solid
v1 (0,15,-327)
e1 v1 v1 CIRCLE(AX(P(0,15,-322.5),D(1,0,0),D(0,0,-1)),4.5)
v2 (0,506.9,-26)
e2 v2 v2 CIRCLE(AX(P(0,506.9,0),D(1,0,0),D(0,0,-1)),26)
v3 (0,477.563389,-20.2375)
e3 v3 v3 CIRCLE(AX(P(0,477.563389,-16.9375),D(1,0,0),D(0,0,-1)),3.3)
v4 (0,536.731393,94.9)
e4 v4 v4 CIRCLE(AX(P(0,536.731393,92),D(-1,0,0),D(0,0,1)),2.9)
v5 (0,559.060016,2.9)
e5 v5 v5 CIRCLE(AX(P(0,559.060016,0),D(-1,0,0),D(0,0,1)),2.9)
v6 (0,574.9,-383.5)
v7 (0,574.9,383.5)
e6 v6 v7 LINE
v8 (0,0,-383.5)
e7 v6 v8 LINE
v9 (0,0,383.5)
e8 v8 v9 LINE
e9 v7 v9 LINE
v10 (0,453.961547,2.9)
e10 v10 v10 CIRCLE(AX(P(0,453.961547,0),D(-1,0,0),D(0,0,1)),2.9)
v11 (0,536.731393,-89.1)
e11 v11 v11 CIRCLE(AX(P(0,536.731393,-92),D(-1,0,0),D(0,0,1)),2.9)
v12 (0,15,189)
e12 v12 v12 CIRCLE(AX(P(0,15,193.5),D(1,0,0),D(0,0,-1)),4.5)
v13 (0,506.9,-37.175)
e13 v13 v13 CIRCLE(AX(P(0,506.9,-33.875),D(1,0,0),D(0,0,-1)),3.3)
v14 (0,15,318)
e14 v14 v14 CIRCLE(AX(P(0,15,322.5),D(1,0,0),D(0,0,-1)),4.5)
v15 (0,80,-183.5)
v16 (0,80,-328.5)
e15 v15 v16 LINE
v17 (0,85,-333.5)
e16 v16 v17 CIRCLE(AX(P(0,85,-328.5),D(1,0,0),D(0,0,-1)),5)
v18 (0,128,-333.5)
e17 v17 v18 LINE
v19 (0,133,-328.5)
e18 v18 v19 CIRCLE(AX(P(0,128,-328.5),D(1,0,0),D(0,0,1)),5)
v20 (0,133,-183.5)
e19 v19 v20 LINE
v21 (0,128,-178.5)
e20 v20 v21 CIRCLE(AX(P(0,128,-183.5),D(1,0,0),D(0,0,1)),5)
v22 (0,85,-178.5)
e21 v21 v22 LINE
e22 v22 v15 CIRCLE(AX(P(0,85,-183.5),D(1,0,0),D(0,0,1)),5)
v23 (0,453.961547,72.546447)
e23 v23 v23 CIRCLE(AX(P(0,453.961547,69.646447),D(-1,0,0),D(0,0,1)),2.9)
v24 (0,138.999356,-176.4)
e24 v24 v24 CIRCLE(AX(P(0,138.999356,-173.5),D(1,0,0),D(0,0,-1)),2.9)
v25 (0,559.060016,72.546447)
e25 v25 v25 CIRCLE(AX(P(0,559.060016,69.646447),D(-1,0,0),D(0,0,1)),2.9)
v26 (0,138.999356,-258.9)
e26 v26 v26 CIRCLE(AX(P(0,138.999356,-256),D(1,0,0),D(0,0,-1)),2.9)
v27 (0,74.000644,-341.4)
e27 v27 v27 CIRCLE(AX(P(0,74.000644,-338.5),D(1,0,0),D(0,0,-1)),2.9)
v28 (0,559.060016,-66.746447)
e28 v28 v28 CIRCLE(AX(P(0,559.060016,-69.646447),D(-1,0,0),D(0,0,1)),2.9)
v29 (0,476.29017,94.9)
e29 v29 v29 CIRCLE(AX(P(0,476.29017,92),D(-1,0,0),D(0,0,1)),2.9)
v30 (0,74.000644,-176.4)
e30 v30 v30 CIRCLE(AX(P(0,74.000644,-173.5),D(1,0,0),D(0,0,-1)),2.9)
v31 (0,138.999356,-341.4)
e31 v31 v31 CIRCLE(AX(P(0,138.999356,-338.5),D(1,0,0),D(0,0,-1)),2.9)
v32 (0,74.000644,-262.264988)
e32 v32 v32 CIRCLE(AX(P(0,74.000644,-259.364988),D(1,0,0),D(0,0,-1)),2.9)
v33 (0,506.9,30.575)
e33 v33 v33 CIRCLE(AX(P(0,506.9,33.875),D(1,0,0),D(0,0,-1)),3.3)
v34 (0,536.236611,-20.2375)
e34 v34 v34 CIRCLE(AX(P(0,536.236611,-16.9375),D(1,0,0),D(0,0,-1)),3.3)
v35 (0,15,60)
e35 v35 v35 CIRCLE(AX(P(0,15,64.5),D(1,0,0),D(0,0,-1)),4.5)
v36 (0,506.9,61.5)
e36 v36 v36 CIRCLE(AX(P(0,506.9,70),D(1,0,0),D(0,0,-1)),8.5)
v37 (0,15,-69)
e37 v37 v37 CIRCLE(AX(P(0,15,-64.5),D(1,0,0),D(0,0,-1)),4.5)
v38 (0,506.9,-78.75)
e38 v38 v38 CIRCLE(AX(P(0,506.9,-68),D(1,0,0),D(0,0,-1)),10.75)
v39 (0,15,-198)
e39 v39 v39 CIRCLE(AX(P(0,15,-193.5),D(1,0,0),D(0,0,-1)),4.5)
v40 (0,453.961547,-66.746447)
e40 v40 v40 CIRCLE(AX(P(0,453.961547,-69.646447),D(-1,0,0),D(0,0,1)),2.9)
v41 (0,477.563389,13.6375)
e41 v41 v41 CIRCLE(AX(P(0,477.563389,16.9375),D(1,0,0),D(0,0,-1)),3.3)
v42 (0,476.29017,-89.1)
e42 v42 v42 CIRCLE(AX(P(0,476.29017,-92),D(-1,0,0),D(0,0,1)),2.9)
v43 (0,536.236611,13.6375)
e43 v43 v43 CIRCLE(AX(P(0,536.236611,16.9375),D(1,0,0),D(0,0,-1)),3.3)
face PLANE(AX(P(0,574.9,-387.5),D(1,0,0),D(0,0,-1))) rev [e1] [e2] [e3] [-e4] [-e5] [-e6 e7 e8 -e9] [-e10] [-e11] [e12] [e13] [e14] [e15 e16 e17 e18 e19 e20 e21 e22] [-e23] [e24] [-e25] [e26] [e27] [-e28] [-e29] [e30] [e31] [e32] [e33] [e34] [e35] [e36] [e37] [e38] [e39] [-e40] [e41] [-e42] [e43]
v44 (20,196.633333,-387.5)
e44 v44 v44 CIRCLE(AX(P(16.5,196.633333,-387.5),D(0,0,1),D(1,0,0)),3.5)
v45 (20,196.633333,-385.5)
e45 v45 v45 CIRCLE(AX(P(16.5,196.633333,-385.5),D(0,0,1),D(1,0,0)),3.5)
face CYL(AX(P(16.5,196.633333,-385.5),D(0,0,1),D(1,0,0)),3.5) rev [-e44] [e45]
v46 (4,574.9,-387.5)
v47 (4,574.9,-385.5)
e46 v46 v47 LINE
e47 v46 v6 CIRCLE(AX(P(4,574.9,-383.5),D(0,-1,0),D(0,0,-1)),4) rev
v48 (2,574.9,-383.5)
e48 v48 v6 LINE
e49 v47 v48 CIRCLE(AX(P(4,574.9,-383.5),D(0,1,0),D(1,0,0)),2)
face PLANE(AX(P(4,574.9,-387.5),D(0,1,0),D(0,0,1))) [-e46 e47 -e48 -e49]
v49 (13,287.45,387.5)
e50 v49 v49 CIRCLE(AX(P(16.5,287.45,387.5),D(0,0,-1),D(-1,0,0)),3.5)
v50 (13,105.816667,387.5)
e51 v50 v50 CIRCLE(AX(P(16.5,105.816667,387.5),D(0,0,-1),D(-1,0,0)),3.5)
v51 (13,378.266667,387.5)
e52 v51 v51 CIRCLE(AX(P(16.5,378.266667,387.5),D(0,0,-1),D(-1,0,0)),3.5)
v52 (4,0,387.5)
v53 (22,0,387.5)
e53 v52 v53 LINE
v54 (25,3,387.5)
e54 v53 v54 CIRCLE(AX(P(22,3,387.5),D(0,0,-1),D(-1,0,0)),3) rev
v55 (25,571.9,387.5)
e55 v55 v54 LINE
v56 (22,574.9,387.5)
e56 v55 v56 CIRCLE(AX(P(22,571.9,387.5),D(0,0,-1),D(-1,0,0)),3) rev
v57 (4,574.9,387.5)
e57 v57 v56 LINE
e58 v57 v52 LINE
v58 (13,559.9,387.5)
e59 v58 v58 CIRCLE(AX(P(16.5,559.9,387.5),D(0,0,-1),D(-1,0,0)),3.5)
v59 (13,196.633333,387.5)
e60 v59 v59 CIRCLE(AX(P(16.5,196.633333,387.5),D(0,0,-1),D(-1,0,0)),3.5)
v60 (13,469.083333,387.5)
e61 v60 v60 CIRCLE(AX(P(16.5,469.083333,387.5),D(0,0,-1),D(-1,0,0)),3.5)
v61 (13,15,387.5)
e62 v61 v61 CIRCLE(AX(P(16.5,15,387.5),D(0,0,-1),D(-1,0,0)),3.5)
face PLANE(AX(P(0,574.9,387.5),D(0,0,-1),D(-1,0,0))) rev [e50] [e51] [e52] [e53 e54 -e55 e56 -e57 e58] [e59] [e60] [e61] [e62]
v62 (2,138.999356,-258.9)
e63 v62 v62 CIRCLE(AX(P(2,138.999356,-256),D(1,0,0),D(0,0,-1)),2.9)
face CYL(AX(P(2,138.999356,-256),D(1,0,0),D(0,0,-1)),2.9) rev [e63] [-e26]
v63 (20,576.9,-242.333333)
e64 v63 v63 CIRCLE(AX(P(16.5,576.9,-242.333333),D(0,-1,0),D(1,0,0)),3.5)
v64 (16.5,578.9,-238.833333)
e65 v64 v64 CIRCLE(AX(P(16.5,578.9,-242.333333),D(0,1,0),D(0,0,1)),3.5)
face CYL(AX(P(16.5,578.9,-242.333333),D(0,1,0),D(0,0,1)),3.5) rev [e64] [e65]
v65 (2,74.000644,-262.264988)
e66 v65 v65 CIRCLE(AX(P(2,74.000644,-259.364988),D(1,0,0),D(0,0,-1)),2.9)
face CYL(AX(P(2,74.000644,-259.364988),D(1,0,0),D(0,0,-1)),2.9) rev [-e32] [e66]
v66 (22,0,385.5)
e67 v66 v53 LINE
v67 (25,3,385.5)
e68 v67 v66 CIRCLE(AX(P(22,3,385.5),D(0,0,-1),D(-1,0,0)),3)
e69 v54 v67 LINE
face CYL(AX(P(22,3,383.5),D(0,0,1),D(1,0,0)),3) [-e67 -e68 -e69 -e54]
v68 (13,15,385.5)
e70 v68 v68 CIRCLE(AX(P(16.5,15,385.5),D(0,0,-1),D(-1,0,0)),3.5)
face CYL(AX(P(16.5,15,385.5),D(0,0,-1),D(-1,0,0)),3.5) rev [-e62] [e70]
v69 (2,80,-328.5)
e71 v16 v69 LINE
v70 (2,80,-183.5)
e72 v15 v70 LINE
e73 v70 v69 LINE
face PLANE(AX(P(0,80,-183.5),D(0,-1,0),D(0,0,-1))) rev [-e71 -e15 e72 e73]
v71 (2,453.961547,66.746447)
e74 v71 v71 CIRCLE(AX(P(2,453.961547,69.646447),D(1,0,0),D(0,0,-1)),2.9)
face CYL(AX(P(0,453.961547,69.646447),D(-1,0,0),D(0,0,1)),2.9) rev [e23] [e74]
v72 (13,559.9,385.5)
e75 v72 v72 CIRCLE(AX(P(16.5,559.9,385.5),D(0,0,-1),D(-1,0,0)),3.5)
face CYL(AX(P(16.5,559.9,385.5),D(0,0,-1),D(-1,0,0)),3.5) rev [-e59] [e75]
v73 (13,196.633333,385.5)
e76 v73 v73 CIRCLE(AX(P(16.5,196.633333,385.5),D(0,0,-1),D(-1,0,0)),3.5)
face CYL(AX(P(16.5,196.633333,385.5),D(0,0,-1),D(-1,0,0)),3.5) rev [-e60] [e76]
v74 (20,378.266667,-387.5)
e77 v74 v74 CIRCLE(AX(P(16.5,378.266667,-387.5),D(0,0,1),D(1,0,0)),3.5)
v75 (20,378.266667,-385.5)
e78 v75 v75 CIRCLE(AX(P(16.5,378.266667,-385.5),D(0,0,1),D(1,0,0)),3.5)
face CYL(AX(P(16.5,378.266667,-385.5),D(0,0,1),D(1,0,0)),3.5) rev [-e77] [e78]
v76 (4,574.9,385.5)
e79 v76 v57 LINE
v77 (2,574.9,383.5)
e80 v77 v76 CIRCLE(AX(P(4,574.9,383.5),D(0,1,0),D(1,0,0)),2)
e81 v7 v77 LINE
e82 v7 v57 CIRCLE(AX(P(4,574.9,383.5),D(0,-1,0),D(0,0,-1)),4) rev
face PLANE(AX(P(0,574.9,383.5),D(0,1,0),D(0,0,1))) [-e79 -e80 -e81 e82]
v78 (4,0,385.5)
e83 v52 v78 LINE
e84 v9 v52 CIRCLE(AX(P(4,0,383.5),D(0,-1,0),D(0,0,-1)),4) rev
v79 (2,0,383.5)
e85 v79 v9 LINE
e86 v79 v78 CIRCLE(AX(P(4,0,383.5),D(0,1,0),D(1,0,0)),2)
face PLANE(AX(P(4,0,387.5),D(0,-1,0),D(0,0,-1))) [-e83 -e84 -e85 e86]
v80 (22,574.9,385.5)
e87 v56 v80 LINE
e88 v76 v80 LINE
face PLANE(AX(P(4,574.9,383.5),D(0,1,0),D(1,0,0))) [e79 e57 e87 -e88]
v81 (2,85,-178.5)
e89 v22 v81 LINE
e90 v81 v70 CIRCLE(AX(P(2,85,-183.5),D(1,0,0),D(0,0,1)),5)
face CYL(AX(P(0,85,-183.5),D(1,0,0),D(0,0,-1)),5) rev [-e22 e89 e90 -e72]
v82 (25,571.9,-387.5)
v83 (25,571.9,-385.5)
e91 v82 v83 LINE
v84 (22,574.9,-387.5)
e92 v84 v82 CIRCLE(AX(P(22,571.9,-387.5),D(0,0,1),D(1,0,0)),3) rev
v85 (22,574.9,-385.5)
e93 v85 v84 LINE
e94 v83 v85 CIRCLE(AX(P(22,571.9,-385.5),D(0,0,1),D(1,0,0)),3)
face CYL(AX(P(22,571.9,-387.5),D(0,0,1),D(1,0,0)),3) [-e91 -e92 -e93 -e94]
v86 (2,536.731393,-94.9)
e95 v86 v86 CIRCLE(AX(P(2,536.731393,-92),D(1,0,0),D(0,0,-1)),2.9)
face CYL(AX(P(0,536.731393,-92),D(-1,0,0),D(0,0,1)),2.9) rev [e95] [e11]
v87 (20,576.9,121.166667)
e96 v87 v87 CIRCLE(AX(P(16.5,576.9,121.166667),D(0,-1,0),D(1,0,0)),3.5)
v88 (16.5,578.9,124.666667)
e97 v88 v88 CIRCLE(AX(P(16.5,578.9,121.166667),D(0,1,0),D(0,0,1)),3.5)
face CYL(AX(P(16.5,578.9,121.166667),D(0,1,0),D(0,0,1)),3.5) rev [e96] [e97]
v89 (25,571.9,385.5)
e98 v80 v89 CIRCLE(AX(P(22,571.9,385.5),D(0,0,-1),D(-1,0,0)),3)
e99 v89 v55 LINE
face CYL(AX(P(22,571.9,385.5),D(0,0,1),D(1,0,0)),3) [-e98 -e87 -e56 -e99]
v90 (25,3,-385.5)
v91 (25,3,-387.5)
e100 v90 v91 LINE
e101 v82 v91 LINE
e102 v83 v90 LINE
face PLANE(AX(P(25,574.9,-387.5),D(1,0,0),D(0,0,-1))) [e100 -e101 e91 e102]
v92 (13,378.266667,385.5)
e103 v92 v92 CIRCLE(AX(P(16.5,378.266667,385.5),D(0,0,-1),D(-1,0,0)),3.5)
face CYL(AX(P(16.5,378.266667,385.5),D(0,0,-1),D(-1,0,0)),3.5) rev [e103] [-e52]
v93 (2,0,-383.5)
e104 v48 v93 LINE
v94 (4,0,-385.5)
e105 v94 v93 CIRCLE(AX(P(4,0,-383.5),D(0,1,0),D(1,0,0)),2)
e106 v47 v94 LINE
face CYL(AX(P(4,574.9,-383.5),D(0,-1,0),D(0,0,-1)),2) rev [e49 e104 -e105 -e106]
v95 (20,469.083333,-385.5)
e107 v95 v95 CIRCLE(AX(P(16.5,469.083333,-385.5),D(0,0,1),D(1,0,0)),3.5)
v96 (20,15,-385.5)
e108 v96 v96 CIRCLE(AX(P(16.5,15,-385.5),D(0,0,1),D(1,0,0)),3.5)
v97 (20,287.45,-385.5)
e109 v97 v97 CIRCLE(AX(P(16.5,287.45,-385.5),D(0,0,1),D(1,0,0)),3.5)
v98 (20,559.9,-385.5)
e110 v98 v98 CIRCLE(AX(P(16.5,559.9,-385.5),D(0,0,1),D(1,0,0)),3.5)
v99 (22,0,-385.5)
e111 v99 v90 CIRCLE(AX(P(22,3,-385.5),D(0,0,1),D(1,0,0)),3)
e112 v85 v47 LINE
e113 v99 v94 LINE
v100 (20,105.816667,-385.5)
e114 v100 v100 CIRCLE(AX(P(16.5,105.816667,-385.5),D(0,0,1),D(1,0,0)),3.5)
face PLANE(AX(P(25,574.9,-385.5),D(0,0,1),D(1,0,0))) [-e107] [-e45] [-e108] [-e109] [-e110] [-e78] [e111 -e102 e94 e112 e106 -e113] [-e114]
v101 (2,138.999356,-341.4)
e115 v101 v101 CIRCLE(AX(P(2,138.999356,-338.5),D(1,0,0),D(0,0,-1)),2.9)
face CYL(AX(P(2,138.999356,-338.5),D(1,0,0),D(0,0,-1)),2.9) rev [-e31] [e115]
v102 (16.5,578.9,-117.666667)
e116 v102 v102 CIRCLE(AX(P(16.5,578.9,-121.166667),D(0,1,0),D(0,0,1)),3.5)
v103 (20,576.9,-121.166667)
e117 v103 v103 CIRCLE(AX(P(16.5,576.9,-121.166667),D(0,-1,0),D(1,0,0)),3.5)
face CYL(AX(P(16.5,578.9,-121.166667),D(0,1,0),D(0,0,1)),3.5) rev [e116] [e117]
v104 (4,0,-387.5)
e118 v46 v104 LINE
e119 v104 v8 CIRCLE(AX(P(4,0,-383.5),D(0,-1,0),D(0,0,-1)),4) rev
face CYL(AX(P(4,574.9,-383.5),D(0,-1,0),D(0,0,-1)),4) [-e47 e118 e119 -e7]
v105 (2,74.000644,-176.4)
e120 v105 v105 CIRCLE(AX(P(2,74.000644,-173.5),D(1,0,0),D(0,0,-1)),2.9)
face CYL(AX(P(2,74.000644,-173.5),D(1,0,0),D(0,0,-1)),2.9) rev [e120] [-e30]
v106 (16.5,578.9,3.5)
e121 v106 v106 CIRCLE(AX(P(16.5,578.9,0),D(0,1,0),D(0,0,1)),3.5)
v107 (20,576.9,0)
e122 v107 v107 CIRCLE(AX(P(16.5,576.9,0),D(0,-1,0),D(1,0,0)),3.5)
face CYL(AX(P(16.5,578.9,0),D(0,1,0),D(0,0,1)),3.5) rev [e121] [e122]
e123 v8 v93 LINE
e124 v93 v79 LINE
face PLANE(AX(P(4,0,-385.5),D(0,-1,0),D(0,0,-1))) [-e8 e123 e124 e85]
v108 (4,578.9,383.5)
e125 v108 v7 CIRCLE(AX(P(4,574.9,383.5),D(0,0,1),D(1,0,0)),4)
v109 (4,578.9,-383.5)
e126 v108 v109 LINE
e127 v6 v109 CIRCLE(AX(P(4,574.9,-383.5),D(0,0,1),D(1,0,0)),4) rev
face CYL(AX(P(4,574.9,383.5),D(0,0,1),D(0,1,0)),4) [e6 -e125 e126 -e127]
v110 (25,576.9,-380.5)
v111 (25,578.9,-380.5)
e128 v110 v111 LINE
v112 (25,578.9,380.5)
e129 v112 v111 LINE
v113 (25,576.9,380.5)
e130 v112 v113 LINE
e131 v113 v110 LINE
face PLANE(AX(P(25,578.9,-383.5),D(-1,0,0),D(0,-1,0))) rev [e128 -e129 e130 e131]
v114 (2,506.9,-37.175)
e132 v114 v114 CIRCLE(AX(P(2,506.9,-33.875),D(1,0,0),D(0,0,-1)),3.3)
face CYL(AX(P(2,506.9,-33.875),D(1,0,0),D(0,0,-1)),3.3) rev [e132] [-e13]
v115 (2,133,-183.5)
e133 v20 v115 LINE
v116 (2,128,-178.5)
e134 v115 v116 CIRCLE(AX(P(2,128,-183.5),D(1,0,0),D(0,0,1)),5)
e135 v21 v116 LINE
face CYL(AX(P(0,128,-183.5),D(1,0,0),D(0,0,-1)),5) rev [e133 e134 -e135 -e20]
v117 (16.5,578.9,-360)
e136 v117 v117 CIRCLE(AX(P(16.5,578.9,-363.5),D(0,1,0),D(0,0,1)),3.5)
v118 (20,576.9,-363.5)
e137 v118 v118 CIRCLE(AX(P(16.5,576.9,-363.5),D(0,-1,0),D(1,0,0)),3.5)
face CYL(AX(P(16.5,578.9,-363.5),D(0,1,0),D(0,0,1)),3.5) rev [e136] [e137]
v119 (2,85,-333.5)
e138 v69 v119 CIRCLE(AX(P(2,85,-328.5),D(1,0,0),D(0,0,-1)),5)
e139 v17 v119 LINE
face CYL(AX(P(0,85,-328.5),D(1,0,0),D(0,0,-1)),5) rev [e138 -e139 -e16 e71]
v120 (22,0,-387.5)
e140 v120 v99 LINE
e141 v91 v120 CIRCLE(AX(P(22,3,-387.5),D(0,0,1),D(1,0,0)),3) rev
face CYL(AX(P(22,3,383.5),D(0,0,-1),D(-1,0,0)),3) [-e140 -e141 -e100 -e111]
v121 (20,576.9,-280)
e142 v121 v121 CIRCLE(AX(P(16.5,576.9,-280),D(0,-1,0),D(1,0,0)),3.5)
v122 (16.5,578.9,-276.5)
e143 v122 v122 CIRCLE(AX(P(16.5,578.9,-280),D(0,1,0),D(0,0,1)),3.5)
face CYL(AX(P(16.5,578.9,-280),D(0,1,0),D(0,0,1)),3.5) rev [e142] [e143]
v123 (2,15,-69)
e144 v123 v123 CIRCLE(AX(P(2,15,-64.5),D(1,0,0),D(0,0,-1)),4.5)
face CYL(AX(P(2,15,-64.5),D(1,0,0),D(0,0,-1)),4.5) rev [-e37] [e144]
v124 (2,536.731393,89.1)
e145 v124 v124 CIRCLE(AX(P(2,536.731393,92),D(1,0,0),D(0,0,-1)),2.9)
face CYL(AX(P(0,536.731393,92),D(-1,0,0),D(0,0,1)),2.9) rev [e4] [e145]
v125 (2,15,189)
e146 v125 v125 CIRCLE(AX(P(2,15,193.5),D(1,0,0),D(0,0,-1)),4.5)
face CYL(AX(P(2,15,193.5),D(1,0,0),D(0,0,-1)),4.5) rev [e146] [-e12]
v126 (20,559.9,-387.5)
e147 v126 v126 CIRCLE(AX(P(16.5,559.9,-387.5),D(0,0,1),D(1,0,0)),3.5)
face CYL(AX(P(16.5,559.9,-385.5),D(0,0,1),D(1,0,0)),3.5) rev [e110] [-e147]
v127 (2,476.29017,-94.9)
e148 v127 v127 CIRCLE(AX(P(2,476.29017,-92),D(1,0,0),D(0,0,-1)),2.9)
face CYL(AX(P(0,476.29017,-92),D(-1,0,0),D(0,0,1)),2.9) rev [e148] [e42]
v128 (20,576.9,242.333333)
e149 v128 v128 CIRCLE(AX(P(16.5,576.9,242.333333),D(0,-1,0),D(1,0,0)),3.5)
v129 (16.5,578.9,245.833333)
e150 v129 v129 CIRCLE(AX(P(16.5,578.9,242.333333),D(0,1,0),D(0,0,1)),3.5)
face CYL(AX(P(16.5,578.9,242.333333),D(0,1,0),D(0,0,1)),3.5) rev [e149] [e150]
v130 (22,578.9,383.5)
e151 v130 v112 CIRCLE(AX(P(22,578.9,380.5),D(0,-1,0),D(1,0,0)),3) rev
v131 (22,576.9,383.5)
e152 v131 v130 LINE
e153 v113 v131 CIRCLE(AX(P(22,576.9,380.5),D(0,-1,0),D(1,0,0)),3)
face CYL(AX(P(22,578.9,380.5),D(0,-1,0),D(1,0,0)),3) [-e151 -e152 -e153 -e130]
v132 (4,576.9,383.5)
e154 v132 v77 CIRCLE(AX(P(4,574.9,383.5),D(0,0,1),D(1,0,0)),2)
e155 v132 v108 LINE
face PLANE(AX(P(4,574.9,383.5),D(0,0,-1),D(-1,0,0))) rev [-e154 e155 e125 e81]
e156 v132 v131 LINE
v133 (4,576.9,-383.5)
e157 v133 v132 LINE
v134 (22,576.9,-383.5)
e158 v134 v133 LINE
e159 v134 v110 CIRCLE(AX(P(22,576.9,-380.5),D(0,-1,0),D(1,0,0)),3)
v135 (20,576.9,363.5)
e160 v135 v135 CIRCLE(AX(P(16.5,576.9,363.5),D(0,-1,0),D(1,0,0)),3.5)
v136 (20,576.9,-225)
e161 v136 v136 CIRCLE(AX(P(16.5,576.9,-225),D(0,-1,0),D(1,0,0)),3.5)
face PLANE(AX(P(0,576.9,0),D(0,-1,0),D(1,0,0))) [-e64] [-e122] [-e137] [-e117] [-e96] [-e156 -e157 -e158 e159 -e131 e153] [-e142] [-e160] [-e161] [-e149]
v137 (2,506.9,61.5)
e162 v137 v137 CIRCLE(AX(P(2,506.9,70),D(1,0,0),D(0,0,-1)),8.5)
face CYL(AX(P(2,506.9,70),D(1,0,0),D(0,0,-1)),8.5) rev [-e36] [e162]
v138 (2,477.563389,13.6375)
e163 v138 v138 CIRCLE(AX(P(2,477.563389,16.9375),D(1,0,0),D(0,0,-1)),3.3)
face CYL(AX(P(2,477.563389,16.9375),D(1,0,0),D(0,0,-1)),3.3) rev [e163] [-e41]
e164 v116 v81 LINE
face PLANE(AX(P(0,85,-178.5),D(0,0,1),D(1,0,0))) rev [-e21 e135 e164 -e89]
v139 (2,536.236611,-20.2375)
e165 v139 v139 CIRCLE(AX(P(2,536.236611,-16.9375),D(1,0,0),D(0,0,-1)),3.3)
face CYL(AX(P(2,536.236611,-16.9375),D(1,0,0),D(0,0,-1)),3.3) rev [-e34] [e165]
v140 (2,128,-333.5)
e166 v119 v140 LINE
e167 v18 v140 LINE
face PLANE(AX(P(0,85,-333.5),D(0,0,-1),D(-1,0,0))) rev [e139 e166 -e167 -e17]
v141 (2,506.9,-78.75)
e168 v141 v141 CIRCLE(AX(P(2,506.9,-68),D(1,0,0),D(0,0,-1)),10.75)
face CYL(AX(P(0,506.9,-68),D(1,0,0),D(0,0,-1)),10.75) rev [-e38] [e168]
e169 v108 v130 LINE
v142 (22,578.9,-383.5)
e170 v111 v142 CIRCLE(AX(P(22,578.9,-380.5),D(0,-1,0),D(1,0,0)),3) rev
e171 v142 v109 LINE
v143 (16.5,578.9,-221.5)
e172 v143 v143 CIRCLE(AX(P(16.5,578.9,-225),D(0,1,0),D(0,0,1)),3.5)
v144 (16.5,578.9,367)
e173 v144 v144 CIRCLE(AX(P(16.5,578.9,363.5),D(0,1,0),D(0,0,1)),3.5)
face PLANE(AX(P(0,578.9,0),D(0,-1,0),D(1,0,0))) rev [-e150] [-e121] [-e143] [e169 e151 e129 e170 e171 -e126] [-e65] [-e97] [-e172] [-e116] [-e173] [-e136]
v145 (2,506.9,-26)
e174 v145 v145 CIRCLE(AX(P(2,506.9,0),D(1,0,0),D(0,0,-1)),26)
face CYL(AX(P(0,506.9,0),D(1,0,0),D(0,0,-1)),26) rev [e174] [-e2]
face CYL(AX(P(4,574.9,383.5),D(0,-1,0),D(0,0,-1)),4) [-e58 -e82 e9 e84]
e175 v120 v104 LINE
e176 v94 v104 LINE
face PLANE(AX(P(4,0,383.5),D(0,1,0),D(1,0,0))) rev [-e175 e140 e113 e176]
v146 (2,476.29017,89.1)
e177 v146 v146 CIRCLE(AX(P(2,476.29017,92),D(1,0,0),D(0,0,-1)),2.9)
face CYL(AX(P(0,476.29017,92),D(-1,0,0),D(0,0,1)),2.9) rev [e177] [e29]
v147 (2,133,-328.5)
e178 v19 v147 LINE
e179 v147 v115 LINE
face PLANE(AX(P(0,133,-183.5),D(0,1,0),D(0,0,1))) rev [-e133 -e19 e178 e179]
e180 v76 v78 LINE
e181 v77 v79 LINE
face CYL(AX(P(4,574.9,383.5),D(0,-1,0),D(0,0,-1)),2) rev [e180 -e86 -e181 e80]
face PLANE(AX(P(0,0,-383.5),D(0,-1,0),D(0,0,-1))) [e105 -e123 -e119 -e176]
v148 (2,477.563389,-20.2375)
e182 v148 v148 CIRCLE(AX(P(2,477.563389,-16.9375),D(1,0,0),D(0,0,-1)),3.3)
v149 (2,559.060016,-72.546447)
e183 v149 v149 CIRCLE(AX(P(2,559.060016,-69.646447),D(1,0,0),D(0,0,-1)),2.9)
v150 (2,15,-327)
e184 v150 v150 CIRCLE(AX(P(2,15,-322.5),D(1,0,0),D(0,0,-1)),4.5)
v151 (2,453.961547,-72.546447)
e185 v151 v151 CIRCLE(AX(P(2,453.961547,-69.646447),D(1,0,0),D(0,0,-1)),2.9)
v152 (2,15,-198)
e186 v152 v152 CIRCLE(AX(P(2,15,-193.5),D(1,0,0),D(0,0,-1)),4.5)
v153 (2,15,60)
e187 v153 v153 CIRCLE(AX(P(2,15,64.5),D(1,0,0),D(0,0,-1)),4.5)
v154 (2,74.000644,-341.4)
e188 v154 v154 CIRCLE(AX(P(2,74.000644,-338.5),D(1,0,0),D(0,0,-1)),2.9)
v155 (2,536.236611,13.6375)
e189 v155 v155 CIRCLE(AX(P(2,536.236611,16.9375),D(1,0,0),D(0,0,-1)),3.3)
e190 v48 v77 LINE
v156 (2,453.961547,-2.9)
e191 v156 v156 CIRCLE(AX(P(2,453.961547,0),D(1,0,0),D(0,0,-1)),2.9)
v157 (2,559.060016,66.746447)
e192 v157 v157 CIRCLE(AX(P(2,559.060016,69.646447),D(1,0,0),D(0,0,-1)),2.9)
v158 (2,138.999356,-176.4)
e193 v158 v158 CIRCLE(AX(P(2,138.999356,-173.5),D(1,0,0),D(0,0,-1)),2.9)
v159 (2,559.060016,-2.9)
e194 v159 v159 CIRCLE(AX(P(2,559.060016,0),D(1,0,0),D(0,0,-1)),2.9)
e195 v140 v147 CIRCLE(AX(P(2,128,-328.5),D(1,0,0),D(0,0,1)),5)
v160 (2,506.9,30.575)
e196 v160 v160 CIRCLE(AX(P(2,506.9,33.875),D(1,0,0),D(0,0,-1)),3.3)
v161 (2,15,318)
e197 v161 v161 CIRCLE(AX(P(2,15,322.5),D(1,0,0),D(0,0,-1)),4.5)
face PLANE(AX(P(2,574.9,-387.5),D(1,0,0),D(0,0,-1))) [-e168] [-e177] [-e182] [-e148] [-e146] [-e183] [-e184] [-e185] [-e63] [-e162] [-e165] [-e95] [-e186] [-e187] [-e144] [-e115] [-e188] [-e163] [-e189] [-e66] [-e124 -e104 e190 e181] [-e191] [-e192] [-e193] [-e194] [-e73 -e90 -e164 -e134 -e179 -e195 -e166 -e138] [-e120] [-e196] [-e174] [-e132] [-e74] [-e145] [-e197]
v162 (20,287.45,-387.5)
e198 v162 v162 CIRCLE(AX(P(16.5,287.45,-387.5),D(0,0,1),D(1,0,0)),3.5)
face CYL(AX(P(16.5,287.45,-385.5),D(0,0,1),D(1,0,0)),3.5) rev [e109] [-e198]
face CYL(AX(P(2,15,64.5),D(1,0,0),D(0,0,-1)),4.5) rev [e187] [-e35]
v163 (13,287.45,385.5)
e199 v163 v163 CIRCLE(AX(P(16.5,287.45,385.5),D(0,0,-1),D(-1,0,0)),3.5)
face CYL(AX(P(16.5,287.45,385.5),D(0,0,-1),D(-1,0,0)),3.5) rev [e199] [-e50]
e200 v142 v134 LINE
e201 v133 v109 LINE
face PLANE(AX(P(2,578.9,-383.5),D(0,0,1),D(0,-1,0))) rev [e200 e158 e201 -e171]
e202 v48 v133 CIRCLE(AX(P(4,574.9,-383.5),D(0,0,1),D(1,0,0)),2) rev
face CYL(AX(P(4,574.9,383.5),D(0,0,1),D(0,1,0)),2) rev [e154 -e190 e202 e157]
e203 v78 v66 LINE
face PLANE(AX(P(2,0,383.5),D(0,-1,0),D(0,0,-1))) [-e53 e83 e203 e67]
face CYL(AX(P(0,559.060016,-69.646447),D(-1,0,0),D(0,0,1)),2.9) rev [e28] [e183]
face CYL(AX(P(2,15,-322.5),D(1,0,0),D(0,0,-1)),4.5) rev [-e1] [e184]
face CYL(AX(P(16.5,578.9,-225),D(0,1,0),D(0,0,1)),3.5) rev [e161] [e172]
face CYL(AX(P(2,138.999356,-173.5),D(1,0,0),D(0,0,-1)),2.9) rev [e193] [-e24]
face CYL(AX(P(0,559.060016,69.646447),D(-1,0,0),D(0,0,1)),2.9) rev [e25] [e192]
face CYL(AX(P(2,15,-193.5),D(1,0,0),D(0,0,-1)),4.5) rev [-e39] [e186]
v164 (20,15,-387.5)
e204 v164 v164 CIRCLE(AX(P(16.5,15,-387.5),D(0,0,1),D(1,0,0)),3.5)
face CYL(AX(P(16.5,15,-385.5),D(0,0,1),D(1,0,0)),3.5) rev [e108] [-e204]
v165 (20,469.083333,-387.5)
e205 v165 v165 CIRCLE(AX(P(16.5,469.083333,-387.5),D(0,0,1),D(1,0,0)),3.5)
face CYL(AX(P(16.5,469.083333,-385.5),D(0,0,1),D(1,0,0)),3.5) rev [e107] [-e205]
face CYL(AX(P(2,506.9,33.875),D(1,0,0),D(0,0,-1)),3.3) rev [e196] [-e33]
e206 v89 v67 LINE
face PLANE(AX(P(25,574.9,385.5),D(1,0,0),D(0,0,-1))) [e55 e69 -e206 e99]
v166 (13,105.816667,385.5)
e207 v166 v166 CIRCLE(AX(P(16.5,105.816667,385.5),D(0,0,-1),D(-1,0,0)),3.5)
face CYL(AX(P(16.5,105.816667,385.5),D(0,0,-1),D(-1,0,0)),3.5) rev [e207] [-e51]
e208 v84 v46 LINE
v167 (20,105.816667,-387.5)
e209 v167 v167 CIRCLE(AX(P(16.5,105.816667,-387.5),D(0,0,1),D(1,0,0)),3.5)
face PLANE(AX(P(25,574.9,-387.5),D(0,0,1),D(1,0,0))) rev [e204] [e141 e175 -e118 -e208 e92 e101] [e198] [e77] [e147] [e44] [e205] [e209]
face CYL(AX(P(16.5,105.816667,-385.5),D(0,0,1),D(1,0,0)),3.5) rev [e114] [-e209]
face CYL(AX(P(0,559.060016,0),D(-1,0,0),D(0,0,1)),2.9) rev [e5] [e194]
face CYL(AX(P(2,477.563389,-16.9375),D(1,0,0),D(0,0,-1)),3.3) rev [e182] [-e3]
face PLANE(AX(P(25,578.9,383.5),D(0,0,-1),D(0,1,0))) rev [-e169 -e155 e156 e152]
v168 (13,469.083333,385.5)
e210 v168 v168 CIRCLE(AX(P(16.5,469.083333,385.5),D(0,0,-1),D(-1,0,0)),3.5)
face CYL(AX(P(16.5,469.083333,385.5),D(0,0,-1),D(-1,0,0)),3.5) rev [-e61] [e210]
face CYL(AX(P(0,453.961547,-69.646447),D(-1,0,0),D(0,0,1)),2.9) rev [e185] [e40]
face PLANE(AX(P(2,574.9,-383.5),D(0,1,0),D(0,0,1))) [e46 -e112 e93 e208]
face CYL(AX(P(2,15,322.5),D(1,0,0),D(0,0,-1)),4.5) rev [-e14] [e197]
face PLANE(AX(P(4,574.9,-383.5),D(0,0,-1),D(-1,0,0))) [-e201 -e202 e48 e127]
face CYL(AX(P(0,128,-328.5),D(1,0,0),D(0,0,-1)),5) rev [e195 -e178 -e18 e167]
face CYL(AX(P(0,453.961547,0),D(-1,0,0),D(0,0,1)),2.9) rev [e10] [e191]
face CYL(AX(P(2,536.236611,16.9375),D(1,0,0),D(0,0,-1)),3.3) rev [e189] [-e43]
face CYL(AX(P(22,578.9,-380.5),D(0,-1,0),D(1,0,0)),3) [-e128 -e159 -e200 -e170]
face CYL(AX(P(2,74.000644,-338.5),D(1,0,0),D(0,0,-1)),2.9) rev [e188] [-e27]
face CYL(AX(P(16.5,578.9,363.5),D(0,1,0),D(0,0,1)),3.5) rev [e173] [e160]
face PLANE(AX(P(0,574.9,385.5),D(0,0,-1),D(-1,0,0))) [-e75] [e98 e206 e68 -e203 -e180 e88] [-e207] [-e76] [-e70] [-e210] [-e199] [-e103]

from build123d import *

# Parameters (mm, degrees)
BASE_FLANGE1_DEPTH           = 574.9
EDGE_FLANGE1_DEPTH           = 767
F_7_0_7_DIAMETER_HOLE1_D     = 7
F_7_0_7_DIAMETER_HOLE1_DEPTH = 2
LPATTERN1_COUNT              = 7
LPATTERN1_PITCH              = 90.816666667
MIRROR1_COPY_1_D             = 7
MIRROR1_COPY_1_DEPTH         = 2
MIRROR1_COPY_2_D             = 7
MIRROR1_COPY_2_DEPTH         = 2
MIRROR1_COPY_3_D             = 7
MIRROR1_COPY_3_DEPTH         = 2
MIRROR1_COPY_4_D             = 7
MIRROR1_COPY_4_DEPTH         = 2
MIRROR1_COPY_5_D             = 7
MIRROR1_COPY_5_DEPTH         = 2
MIRROR1_COPY_6_D             = 7
MIRROR1_COPY_6_DEPTH         = 2
F_7_0_7_DIAMETER_HOLE2_D     = 7
LPATTERN2_COUNT              = 7
LPATTERN2_PITCH              = 121.166666667
M8_CLEARANCE_HOLE1_D         = 9
LPATTERN3_COUNT              = 6
LPATTERN3_PITCH              = 129
F_7_0_7_DIAMETER_HOLE3_D     = 7
SKETCH21_R                   = 26
CUT_EXTRUDE1_DEPTH           = 20
M6_CLEARANCE_HOLE1_D         = 6.6
M5_CLEARANCE_HOLE1_D         = 5.8
SKETCH26_R                   = 10.75
CUT_EXTRUDE2_DEPTH           = 10
M16_CLEARANCE_HOLE1_D        = 17
CUT_EXTRUDE3_DEPTH           = 10
M5_CLEARANCE_HOLE2_D         = 5.8
FILLET1_R                    = 3


# Sheet-metal steps are written as plain solids
with BuildPart() as part:
    # Sketch1 → Base-Flange1 (new body)
    with BuildSketch(Plane(origin=(0, 0, 0), x_dir=(1, 0, 0), z_dir=(0, 1, 0))):
        with BuildLine():
            Line((25, 387.5), (4, 387.5))
            ThreePointArc((4, 387.5), (1.171572875, 386.328427125), (0, 383.5))
            Line((0, 383.5), (0, -383.5))
            ThreePointArc((0, -383.5), (1.171572875, -386.328427125), (4, -387.5))
            Line((4, -387.5), (25, -387.5))
            Line((25, -387.5), (25, -385.5))
            Line((25, -385.5), (4, -385.5))
            ThreePointArc((4, -385.5), (2.585786438, -384.914213562), (2, -383.5))
            Line((2, -383.5), (2, 383.5))
            ThreePointArc((2, 383.5), (2.585786438, 384.914213562), (4, 385.5))
            Line((4, 385.5), (25, 385.5))
            Line((25, 385.5), (25, 387.5))
        make_face()
    extrude(amount=BASE_FLANGE1_DEPTH)

    # Edge-Flange1 section (across the edge) → Edge-Flange1 (add)
    with BuildSketch(Plane(origin=(2, 576.9, -383.5), x_dir=(0, -1, 0), z_dir=(0, 0, 1))):
        with BuildLine():
            Line((-2, 2), (-2, 23))
            Line((-2, 23), (0, 23))
            Line((0, 23), (0, 2))
            ThreePointArc((0, 2), (0.585786438, 0.585786438), (2, 0))
            Line((2, 0), (2, -2))
            ThreePointArc((2, -2), (-0.828427125, -0.828427125), (-2, 2))
        make_face()
    extrude(amount=EDGE_FLANGE1_DEPTH)

    # Ø7.0 (7) Diameter Hole1
    with Locations(Plane(origin=(0, 0, 385.5), x_dir=(-1, 0, 0), z_dir=(0, 0, -1))):
        with Locations((-16.5, 559.9)):
            f_7_0_7_diameter_hole1 = Hole(F_7_0_7_DIAMETER_HOLE1_D / 2, depth=F_7_0_7_DIAMETER_HOLE1_DEPTH)

    # LPattern1: Ø7.0 (7) Diameter Hole1 ×7
    with Locations(*[(0, -i * LPATTERN1_PITCH, 0) for i in range(1, LPATTERN1_COUNT)]):
        add(f_7_0_7_diameter_hole1, mode=Mode.SUBTRACT)

    # Mirror1: Ø7.0 (7) Diameter Hole1 across plane
    add(f_7_0_7_diameter_hole1.mirror(Plane.XY), mode=Mode.SUBTRACT)

    # Mirror1 copy 1
    with Locations(Plane(origin=(0, -90.816666667, -385.5), x_dir=(-1, 0, 0), z_dir=(0, 0, 1))):
        with Locations((-16.5, -559.9)):
            Hole(MIRROR1_COPY_1_D / 2, depth=MIRROR1_COPY_1_DEPTH)

    # Mirror1 copy 2
    with Locations(Plane(origin=(0, -181.633333333, -385.5), x_dir=(-1, 0, 0), z_dir=(0, 0, 1))):
        with Locations((-16.5, -559.9)):
            Hole(MIRROR1_COPY_2_D / 2, depth=MIRROR1_COPY_2_DEPTH)

    # Mirror1 copy 3
    with Locations(Plane(origin=(0, -272.45, -385.5), x_dir=(-1, 0, 0), z_dir=(0, 0, 1))):
        with Locations((-16.5, -559.9)):
            Hole(MIRROR1_COPY_3_D / 2, depth=MIRROR1_COPY_3_DEPTH)

    # Mirror1 copy 4
    with Locations(Plane(origin=(0, -363.266666667, -385.5), x_dir=(-1, 0, 0), z_dir=(0, 0, 1))):
        with Locations((-16.5, -559.9)):
            Hole(MIRROR1_COPY_4_D / 2, depth=MIRROR1_COPY_4_DEPTH)

    # Mirror1 copy 5
    with Locations(Plane(origin=(0, -454.083333333, -385.5), x_dir=(-1, 0, 0), z_dir=(0, 0, 1))):
        with Locations((-16.5, -559.9)):
            Hole(MIRROR1_COPY_5_D / 2, depth=MIRROR1_COPY_5_DEPTH)

    # Mirror1 copy 6
    with Locations(Plane(origin=(0, -544.9, -385.5), x_dir=(-1, 0, 0), z_dir=(0, 0, 1))):
        with Locations((-16.5, -559.9)):
            Hole(MIRROR1_COPY_6_D / 2, depth=MIRROR1_COPY_6_DEPTH)

    # Ø7.0 (7) Diameter Hole2 (through all)
    with Locations(Plane(origin=(0, 578.9, 0), x_dir=(1, 0, 0), z_dir=(0, 1, 0))):
        with Locations((16.5, -363.5)):
            f_7_0_7_diameter_hole2 = Hole(F_7_0_7_DIAMETER_HOLE2_D / 2)

    # LPattern2: Ø7.0 (7) Diameter Hole2 ×7
    with Locations(*[(0, 0, -i * LPATTERN2_PITCH) for i in range(1, LPATTERN2_COUNT)]):
        add(f_7_0_7_diameter_hole2, mode=Mode.SUBTRACT)

    # M8 Clearance Hole1 (through all)
    with Locations(Plane(origin=(2, 0, 0), x_dir=(0, 0, -1), z_dir=(1, 0, 0))):
        with Locations((-322.5, 15)):
            m8_clearance_hole1 = Hole(M8_CLEARANCE_HOLE1_D / 2)

    # LPattern3: M8 Clearance Hole1 ×6
    with Locations(*[(0, 0, -i * LPATTERN3_PITCH) for i in range(1, LPATTERN3_COUNT)]):
        add(m8_clearance_hole1, mode=Mode.SUBTRACT)

    # Ø7.0 (7) Diameter Hole3 (through all)
    with Locations(Plane(origin=(0, 578.9, 0), x_dir=(1, 0, 0), z_dir=(0, 1, 0))):
        with Locations((16.5, 280), (16.5, 225)):
            Hole(F_7_0_7_DIAMETER_HOLE3_D / 2)

    # Sketch21 → Cut-Extrude1 (cut)
    with BuildSketch(Plane(origin=(2, 0, 0), x_dir=(0, 0, -1), z_dir=(1, 0, 0))):
        with Locations((0, 506.9)):
            Circle(SKETCH21_R)
    extrude(amount=-CUT_EXTRUDE1_DEPTH, mode=Mode.SUBTRACT)

    # M6 Clearance Hole1 (through all)
    with Locations(Plane(origin=(2, 0, 0), x_dir=(0, 0, -1), z_dir=(1, 0, 0))):
        with Locations((-33.875, 506.9), (-16.9375, 536.236610553), (-16.9375, 477.563389447), (16.9375, 477.563389447), (16.9375, 536.236610553), (33.875, 506.9)):
            Hole(M6_CLEARANCE_HOLE1_D / 2)

    # M5 Clearance Hole1 (through all)
    with Locations(Plane.ZY):
        with Locations((-69.646446609, 453.961547076), (-92, 476.290170104), (-92, 536.731392746), (0, 453.961547076), (69.646446609, 453.961547076), (92, 476.290170104), (92, 536.731392746), (69.646446609, 559.060015773), (0, 559.060015773), (-69.646446609, 559.060015773)):
            Hole(M5_CLEARANCE_HOLE1_D / 2)

    # Sketch26 → Cut-Extrude2 (cut)
    with BuildSketch(Plane(origin=(2, 0, 0), x_dir=(0, 0, -1), z_dir=(1, 0, 0))):
        with Locations((68, 506.9)):
            Circle(SKETCH26_R)
    extrude(amount=-CUT_EXTRUDE2_DEPTH, mode=Mode.SUBTRACT)

    # M16 Clearance Hole1 (through all)
    with Locations(Plane(origin=(2, 0, 0), x_dir=(0, 0, -1), z_dir=(1, 0, 0))):
        with Locations((-70, 506.9)):
            Hole(M16_CLEARANCE_HOLE1_D / 2)

    # Sketch29 → Cut-Extrude3 (cut)
    with BuildSketch(Plane(origin=(2, 0, 0), x_dir=(0, 0, -1), z_dir=(1, 0, 0))):
        with BuildLine():
            Line((183.5, 80), (328.5, 80))
            ThreePointArc((328.5, 80), (332.035533906, 81.464466094), (333.5, 85))
            Line((333.5, 85), (333.5, 128))
            ThreePointArc((333.5, 128), (332.035533906, 131.535533906), (328.5, 133))
            Line((328.5, 133), (183.5, 133))
            ThreePointArc((183.5, 133), (179.964466094, 131.535533906), (178.5, 128))
            Line((178.5, 128), (178.5, 85))
            ThreePointArc((178.5, 85), (179.964466094, 81.464466094), (183.5, 80))
        make_face()
    extrude(amount=-CUT_EXTRUDE3_DEPTH, mode=Mode.SUBTRACT)

    # M5 Clearance Hole2 (through all)
    with Locations(Plane(origin=(2, 0, 0), x_dir=(0, 0, -1), z_dir=(1, 0, 0))):
        with Locations((256, 138.999355653), (173.5, 138.999355653), (338.5, 138.999355653), (338.5, 74.000644347), (259.364988053, 74.000644347), (173.5, 74.000644347)):
            Hole(M5_CLEARANCE_HOLE2_D / 2)

    # Fillet1
    fillet1_edges = [part.edges().sort_by_distance(p)[0] for p in [
        (25, 0, -386.5),
        (25, 0, 386.5),
        (25, 574.9, -386.5),
        (25, 577.9, -383.5),
        (25, 577.9, 383.5),
        (25, 574.9, 386.5),
    ]]
    fillet(fillet1_edges, radius=FILLET1_R)


solid = part.part
